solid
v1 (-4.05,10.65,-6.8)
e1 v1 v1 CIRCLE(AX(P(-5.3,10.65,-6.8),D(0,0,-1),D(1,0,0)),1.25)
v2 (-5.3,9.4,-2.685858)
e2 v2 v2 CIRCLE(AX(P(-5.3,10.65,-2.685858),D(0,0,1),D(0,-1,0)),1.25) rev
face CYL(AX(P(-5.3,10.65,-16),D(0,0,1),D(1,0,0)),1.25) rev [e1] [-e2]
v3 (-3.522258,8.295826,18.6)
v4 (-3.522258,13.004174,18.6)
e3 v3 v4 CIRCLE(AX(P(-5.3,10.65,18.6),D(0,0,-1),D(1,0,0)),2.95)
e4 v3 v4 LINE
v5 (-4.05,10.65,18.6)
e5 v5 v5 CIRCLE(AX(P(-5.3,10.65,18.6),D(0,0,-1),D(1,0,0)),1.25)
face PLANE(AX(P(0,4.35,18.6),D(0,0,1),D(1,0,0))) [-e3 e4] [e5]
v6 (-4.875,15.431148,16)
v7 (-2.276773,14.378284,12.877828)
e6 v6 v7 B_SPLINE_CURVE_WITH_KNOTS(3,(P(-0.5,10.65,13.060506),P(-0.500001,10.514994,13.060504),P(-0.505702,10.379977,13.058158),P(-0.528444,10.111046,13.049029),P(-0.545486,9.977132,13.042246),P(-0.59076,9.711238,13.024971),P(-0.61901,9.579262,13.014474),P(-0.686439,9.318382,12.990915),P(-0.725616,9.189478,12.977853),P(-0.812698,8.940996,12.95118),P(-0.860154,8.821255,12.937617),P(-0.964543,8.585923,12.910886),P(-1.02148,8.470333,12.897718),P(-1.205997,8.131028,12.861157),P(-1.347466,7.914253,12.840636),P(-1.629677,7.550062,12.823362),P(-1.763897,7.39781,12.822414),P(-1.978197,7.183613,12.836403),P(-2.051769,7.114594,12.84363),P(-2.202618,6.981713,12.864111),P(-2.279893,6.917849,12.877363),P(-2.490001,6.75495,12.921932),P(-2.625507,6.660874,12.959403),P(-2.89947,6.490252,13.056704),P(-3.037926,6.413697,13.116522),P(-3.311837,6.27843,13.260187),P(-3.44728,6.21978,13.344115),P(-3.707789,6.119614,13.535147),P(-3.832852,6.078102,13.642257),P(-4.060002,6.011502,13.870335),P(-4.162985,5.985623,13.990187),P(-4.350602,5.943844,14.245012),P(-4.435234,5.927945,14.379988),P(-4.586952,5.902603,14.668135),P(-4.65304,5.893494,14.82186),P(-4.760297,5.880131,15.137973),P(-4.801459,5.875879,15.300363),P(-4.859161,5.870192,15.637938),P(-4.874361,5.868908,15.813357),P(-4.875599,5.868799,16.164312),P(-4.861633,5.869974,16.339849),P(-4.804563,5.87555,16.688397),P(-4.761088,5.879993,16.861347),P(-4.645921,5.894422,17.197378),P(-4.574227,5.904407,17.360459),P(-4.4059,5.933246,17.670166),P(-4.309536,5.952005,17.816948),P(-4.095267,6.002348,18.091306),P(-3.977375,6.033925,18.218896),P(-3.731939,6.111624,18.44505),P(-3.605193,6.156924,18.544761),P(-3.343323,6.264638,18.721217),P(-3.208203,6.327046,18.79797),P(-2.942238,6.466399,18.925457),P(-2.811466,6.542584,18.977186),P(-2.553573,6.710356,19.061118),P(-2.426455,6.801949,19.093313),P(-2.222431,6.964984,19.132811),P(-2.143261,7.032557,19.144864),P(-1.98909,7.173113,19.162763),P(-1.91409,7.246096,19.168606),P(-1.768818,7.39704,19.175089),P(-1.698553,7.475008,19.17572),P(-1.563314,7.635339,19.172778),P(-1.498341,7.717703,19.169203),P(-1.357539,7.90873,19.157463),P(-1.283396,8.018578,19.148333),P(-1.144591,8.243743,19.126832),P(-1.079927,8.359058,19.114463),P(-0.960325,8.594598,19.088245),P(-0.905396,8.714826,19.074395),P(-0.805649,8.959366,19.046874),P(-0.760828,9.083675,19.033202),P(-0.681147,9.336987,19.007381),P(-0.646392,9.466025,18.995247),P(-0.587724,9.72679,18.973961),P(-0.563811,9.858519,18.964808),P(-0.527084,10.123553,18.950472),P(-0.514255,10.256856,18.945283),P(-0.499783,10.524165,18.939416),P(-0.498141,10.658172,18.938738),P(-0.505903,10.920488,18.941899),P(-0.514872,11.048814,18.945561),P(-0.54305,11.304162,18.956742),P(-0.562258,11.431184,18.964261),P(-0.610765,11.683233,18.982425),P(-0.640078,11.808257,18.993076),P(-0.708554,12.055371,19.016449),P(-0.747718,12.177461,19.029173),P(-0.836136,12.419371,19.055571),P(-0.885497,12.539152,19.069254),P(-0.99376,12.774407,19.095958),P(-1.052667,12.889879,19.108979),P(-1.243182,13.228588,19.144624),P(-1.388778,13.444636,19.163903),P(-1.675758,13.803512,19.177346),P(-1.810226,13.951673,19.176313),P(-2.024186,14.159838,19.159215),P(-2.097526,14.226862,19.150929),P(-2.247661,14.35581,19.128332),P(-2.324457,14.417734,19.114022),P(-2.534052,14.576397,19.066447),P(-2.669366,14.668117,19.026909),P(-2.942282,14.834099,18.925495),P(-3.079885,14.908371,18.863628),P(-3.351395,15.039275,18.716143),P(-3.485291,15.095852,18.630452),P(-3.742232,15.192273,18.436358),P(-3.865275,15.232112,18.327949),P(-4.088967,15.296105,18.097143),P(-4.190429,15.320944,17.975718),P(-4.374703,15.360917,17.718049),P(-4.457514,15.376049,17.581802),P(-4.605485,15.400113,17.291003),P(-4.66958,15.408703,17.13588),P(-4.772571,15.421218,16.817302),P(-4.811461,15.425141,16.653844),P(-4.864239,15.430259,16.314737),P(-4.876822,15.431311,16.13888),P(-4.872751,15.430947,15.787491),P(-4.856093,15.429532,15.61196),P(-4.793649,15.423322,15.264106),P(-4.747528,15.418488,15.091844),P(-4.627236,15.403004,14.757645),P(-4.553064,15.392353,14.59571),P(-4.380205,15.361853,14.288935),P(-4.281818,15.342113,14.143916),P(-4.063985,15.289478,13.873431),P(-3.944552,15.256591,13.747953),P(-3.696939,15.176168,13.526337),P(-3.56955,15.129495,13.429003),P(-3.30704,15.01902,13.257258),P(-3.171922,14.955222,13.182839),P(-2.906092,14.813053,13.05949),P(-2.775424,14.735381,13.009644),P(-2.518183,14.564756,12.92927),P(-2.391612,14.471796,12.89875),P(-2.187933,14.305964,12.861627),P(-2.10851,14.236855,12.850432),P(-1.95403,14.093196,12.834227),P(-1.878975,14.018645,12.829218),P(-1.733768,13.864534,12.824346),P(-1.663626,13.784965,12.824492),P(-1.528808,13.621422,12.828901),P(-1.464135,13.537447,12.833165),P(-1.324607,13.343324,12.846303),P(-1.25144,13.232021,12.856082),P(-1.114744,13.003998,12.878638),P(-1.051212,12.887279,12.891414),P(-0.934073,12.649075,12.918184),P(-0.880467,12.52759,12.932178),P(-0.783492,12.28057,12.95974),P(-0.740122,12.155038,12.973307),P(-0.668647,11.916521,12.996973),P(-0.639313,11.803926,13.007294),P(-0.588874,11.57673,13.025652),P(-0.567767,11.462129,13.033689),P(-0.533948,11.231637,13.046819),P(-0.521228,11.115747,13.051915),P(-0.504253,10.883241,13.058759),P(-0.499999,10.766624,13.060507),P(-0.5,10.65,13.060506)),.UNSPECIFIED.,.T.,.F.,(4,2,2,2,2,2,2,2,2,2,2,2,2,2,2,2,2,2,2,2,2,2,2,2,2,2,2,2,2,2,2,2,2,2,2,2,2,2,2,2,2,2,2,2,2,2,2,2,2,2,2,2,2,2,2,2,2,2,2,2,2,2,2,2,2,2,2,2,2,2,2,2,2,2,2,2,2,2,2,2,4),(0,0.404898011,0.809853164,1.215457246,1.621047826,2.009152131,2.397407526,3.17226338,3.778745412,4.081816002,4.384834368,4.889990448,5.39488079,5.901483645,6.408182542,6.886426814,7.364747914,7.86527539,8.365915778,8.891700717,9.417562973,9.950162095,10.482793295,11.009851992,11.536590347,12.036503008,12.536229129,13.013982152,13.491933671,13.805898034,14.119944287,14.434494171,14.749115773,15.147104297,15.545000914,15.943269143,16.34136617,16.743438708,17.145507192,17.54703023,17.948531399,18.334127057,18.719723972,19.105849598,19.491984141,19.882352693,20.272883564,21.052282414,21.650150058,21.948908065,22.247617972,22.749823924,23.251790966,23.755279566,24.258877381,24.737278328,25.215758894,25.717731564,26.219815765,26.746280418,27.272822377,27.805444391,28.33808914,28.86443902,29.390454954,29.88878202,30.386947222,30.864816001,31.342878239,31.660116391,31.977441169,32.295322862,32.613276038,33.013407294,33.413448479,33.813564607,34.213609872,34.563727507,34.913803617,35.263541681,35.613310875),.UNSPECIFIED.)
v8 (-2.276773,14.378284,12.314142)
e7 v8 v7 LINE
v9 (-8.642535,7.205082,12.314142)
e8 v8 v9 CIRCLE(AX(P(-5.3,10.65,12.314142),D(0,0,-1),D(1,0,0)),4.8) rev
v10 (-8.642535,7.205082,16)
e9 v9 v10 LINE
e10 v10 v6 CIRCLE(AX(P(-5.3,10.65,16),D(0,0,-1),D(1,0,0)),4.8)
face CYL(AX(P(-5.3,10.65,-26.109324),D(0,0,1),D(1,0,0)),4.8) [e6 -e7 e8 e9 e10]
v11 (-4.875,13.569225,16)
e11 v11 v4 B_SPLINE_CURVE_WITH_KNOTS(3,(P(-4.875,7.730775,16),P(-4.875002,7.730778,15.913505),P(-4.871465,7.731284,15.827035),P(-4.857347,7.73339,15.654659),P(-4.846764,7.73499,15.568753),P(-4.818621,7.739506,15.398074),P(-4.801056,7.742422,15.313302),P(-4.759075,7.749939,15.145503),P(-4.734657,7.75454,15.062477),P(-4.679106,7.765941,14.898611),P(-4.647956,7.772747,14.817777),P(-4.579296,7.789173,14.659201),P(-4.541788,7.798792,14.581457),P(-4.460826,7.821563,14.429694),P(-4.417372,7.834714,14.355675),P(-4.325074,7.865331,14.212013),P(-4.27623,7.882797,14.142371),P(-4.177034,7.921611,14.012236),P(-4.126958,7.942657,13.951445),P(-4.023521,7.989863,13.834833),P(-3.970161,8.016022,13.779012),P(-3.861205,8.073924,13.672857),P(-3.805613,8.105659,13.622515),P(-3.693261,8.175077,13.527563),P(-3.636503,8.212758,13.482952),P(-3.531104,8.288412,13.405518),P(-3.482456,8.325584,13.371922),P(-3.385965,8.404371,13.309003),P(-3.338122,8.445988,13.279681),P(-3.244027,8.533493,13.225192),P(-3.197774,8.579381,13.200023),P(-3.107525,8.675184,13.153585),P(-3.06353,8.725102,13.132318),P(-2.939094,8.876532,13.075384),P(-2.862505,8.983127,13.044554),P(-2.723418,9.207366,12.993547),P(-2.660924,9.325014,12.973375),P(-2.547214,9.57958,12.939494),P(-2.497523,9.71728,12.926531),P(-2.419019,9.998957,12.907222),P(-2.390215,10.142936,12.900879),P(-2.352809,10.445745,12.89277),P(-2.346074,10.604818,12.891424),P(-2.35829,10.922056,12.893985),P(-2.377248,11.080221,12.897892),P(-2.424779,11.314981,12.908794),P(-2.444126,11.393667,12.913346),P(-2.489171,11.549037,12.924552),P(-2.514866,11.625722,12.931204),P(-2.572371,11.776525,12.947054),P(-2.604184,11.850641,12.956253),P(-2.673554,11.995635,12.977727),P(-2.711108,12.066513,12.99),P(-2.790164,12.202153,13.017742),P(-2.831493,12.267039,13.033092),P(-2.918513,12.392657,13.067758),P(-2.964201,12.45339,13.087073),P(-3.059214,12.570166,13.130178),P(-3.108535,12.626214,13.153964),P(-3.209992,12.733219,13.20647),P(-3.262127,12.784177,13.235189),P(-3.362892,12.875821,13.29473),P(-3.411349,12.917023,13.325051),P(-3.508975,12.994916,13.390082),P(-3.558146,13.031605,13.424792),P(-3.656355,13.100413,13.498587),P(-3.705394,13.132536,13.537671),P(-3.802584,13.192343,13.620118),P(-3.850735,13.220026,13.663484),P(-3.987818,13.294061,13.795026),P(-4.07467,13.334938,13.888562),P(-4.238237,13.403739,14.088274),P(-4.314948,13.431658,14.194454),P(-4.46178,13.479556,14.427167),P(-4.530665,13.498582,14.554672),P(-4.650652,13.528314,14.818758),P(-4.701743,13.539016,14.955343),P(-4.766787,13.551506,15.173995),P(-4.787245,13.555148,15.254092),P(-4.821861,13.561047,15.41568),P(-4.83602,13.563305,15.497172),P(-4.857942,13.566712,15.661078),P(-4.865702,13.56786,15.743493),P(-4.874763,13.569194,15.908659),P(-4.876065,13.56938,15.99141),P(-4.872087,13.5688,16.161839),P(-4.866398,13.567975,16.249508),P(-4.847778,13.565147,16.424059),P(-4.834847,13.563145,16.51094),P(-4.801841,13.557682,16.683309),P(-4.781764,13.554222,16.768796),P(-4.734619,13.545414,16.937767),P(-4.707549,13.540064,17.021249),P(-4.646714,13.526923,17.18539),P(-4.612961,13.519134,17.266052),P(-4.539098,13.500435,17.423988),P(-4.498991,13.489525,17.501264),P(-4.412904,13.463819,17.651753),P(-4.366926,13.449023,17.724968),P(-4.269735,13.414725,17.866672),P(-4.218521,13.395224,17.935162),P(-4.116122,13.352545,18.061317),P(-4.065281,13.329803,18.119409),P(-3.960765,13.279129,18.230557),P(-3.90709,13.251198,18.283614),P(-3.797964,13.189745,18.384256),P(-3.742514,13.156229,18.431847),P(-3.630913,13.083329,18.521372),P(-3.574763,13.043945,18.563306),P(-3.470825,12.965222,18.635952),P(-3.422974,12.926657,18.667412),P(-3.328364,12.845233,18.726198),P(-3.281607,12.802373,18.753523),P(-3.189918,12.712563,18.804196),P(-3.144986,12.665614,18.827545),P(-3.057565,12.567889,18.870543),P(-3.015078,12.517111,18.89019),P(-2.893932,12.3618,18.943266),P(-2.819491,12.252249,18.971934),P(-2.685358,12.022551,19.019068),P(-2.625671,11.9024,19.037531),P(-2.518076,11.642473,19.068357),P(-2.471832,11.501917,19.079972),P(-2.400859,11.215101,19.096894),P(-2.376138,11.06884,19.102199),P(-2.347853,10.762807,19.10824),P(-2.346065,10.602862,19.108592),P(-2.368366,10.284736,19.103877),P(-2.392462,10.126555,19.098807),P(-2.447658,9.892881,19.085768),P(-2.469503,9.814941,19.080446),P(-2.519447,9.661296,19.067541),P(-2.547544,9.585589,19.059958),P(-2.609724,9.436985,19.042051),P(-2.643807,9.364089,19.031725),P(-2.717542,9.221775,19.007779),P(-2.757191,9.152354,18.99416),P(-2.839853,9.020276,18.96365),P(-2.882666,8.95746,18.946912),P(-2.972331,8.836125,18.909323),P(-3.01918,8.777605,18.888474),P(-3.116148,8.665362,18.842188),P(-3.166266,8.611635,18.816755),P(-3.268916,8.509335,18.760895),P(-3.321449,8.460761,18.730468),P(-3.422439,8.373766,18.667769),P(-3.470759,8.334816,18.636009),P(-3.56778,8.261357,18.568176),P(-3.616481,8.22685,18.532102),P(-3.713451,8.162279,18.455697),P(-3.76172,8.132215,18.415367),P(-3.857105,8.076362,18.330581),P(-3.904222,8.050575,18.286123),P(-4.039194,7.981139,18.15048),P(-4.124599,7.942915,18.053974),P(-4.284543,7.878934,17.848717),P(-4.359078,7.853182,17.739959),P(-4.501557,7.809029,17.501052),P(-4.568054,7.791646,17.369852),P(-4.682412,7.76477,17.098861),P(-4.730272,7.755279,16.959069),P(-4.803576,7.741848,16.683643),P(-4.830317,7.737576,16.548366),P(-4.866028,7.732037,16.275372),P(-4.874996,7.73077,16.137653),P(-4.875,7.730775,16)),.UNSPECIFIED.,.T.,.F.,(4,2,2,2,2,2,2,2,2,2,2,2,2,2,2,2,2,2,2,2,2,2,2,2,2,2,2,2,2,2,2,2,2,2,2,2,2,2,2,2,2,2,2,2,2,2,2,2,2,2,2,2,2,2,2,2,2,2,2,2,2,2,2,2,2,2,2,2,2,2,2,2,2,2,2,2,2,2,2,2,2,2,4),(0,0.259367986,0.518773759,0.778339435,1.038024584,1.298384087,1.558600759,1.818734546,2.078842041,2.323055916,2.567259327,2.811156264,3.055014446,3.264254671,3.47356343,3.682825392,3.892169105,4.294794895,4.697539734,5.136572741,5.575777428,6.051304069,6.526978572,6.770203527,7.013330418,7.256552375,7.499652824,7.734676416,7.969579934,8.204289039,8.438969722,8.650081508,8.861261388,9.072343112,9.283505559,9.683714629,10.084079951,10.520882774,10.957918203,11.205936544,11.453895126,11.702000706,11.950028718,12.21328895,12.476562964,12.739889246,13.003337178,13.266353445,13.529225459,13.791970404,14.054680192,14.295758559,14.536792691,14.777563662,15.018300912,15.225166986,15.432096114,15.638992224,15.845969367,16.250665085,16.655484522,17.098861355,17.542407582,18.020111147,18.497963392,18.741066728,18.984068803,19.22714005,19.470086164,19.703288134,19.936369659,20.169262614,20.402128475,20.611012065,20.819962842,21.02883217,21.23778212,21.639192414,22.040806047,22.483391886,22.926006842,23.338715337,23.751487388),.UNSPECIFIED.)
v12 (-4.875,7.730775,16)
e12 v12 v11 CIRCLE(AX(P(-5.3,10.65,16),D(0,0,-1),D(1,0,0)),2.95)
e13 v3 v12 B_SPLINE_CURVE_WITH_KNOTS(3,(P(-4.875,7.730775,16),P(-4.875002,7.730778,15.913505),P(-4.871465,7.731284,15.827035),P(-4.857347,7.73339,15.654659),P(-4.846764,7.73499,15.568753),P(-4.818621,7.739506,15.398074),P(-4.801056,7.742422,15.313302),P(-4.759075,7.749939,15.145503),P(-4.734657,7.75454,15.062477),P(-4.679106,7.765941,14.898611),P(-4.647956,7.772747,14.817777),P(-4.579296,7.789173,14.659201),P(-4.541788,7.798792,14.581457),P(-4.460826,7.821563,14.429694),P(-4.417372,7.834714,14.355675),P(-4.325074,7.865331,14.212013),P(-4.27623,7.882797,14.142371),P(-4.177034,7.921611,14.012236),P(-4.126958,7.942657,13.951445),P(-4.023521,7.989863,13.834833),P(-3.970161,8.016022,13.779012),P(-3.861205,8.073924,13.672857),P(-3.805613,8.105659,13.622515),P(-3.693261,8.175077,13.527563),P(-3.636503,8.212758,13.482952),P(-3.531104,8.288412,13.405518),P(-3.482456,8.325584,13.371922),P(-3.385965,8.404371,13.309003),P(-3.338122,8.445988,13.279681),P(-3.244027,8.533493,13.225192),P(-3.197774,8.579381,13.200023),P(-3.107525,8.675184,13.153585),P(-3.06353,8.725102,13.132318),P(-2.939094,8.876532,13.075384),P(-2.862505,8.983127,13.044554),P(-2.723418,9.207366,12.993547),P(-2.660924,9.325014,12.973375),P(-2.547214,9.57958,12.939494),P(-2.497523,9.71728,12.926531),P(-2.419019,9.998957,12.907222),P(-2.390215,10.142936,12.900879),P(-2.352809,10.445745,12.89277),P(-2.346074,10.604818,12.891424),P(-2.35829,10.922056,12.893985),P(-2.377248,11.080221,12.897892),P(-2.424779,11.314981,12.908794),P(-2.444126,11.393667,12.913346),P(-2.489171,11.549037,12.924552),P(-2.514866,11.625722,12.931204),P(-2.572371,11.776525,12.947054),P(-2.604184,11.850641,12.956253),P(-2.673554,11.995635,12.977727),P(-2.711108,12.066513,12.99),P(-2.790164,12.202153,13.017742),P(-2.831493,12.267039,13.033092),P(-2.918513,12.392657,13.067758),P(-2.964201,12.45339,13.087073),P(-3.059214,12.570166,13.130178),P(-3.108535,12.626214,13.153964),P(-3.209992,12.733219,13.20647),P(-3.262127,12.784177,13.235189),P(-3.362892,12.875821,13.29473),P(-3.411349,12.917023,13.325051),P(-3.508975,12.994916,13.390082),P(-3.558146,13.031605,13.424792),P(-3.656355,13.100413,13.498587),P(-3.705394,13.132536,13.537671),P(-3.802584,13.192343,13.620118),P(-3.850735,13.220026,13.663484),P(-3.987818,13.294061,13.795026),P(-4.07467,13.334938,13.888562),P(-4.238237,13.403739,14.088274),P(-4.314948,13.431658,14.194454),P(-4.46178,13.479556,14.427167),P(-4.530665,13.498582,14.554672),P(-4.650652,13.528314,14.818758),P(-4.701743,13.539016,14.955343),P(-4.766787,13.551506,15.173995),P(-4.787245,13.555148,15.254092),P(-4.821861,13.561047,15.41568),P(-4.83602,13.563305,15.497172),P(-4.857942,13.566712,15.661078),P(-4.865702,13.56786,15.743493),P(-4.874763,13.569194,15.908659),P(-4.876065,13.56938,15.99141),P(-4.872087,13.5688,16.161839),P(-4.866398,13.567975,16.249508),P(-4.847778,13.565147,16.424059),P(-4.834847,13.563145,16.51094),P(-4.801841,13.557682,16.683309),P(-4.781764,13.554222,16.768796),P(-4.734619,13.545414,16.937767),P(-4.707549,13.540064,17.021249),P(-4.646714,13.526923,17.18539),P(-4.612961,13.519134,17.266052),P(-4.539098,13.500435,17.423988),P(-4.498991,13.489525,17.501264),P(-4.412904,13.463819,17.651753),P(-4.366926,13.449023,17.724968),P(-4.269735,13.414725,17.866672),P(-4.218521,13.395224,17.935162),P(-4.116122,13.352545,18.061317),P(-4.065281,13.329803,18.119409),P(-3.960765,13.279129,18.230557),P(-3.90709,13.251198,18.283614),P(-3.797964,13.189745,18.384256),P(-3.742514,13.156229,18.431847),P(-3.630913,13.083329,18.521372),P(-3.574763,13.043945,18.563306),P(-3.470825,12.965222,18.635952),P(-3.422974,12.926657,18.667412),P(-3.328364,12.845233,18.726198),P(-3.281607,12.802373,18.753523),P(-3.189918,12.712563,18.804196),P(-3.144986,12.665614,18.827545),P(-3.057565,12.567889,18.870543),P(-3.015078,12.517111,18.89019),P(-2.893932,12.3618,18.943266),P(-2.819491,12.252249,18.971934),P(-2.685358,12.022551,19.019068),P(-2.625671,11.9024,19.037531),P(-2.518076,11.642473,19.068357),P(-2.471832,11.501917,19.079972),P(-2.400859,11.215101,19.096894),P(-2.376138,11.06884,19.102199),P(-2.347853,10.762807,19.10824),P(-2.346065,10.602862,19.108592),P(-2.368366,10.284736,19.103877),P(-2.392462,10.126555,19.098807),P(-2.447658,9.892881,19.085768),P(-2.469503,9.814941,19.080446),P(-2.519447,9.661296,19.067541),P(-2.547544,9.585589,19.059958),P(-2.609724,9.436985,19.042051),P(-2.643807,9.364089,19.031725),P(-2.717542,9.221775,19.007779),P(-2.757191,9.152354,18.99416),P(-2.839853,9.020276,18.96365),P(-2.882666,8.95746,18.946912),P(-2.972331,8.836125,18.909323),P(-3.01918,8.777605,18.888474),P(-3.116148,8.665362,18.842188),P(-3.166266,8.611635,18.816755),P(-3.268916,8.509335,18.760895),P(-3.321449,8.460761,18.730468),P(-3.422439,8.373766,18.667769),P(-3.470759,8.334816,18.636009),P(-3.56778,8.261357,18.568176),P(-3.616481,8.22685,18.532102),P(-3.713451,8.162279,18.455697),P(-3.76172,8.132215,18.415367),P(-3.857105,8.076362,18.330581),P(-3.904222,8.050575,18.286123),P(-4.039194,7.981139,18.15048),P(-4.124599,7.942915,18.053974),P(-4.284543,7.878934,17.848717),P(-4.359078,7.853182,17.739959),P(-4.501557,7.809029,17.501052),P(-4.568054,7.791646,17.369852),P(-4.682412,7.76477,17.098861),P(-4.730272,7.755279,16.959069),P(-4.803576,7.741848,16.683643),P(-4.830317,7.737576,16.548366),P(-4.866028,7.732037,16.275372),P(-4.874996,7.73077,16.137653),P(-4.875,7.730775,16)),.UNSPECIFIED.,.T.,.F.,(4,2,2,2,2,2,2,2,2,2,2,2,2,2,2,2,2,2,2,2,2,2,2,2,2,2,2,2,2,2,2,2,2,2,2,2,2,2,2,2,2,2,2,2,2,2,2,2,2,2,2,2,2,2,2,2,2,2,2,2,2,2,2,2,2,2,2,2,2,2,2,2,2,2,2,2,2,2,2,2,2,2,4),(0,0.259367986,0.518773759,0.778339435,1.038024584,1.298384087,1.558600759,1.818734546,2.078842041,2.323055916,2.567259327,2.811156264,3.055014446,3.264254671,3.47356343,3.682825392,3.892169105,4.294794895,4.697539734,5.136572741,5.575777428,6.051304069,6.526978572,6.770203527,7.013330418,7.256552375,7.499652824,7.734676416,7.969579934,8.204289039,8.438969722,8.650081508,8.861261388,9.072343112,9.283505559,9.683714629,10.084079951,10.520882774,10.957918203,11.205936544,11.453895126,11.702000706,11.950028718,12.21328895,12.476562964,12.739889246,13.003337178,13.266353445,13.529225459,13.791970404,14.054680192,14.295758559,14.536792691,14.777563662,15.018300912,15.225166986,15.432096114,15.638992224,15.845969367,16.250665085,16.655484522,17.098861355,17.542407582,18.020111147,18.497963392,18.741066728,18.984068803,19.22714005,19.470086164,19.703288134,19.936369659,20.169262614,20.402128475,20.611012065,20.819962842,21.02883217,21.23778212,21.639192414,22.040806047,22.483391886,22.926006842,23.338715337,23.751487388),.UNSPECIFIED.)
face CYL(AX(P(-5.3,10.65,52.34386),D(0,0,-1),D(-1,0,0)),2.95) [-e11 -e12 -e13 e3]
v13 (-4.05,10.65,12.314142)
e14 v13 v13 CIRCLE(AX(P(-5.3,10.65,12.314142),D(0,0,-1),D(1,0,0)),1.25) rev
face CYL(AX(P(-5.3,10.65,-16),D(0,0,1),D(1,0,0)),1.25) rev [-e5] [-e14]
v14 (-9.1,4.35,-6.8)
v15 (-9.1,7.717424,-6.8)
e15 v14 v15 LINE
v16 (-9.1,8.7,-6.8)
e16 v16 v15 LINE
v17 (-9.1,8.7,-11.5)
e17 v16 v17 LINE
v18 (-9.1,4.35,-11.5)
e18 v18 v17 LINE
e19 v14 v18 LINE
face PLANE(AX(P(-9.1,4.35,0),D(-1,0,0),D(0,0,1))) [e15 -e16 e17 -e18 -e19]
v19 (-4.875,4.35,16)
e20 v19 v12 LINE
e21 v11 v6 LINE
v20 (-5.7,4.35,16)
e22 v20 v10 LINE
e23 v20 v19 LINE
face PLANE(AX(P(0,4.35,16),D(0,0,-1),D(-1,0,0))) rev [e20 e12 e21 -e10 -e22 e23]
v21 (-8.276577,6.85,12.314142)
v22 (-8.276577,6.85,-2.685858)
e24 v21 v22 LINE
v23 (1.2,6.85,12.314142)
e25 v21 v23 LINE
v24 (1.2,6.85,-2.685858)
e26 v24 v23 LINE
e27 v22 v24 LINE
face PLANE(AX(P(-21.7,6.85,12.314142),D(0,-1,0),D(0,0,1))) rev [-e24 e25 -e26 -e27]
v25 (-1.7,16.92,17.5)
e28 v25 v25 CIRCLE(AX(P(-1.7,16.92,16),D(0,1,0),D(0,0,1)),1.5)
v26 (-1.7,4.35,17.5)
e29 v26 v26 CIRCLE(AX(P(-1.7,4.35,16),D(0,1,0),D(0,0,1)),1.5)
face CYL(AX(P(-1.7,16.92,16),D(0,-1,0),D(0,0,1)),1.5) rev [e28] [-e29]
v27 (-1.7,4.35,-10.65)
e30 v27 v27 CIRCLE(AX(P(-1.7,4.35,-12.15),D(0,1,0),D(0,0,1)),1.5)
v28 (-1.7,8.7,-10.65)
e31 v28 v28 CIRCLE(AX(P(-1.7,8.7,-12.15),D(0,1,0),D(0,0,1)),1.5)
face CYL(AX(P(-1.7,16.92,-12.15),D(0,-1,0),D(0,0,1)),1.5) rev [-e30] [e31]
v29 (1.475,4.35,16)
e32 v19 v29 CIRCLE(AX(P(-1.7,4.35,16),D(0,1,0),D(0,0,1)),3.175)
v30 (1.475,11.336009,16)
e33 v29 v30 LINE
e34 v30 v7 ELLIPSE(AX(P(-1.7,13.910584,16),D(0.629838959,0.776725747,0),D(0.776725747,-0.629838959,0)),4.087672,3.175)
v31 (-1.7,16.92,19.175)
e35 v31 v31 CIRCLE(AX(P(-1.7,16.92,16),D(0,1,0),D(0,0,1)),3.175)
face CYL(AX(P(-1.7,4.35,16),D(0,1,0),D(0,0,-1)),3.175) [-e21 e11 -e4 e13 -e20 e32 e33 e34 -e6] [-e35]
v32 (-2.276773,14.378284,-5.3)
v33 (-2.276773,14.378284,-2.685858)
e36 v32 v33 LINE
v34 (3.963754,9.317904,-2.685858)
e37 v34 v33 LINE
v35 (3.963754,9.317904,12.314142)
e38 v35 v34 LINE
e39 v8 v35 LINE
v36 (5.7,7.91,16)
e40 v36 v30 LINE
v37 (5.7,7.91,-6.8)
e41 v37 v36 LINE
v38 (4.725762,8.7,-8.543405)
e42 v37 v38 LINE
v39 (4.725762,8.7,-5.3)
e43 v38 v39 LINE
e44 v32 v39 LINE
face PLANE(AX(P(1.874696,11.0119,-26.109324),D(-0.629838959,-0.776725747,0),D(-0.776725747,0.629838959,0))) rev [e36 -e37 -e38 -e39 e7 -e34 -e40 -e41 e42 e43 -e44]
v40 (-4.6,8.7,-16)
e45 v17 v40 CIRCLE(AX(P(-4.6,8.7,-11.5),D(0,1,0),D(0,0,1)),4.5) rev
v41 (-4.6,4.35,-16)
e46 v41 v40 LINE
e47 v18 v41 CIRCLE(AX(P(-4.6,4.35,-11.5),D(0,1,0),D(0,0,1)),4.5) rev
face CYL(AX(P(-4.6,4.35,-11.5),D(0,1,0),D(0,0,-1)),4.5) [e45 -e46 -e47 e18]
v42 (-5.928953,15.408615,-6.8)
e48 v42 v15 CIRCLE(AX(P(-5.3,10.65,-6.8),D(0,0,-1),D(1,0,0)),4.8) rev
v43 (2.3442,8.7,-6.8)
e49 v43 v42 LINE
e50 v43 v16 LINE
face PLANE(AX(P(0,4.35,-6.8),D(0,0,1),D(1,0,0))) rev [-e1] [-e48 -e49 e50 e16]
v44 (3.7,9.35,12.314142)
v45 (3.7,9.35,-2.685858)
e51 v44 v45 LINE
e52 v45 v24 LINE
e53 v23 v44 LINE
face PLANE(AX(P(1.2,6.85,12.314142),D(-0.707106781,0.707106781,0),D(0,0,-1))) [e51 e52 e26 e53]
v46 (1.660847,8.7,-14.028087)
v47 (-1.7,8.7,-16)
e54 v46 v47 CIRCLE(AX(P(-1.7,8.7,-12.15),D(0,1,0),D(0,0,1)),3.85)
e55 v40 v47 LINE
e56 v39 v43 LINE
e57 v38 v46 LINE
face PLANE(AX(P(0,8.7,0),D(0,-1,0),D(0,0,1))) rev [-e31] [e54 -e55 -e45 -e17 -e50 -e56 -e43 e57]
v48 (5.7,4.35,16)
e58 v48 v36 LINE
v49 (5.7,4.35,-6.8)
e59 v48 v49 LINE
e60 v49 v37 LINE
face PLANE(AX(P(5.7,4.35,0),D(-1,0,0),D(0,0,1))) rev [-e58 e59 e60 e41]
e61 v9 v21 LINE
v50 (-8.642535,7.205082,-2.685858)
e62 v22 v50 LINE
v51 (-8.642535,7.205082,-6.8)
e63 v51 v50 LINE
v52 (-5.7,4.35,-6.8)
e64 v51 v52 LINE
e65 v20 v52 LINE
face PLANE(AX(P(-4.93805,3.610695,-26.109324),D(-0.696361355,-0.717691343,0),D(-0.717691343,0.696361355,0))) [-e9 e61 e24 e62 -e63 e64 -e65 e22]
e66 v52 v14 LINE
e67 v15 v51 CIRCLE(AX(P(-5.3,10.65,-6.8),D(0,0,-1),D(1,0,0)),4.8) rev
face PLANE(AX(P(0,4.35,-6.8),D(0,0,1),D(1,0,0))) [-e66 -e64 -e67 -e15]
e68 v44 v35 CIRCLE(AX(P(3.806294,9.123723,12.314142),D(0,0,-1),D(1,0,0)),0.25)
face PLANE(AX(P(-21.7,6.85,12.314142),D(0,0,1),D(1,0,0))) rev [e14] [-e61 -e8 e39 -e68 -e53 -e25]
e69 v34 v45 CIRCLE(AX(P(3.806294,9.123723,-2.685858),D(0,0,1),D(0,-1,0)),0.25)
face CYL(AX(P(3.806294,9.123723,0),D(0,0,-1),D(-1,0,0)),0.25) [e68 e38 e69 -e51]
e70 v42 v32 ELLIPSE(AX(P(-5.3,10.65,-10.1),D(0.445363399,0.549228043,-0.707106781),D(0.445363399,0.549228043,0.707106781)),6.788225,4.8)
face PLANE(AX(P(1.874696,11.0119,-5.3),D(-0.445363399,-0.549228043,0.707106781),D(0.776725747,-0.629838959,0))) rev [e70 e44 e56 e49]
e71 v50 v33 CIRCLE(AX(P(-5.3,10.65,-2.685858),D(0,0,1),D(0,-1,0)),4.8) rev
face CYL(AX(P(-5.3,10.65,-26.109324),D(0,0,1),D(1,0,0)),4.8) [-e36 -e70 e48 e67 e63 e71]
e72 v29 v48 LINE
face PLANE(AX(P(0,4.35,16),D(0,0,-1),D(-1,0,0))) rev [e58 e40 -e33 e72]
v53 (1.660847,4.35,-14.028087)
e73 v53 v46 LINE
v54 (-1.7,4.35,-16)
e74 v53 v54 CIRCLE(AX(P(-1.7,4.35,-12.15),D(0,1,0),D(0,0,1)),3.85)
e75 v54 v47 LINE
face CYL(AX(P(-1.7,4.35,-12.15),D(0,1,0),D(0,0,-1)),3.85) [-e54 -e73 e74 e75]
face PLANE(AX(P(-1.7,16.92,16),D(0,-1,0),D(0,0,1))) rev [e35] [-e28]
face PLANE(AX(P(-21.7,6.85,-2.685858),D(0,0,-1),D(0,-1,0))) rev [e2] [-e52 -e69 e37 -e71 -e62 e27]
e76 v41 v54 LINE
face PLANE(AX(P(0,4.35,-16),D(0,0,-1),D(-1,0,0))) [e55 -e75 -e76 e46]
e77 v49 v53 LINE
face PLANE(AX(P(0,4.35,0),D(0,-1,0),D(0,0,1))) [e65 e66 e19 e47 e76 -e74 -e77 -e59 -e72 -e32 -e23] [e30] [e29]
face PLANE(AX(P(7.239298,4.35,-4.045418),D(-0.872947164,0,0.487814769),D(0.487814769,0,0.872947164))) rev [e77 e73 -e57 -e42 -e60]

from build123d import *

# Parameters (mm, degrees)
BOSS_EXTRUDE1_DEPTH = 4.35
BOSS_EXTRUDE2_DEPTH = 22.8
CUT_EXTRUDE1_DEPTH  = 35.228241264
BOSS_EXTRUDE3_START = -12.57
SKETCH5_R           = 3.175
BOSS_EXTRUDE3_DEPTH = 12.57
SKETCH6_R           = 2.95
BOSS_EXTRUDE4_DEPTH = 2.6
CHAMFER1_SIZE       = 1.5
SKETCH7_R           = 1.5
CUT_EXTRUDE2_DEPTH  = 26.053852665
SKETCH8_R           = 1.25
CUT_EXTRUDE3_DEPTH  = 37.969425255
SKETCH9_W           = 15
SKETCH9_H           = 8.6
CUT_EXTRUDE4_DEPTH  = 25.4
CHAMFER2_SIZE       = 2.5
FILLET1_R           = 0.25


with BuildPart() as part:
    # Sketch2 → Boss-Extrude1 (new body)
    with BuildSketch(Plane(origin=(0, 0, 0), x_dir=(1, 0, 0), z_dir=(0, 1, 0))):
        with BuildLine():
            ThreePointArc((1.475, -16), (-1.7, -12.825), (-4.875, -16))
            Line((-4.875, -16), (1.475, -16))
        make_face()
        with BuildLine():
            Line((1.475, -16), (-4.875, -16))
            ThreePointArc((-4.875, -16), (-1.7, -19.175), (1.475, -16))
        make_face()
        with BuildLine():
            Line((-5.7, 15.863484846), (-5.7, 6.8))
            Line((-5.7, 6.8), (-5.7, -16))
            Line((-5.7, -16), (-4.875, -16))
            ThreePointArc((-4.875, -16), (-1.7, -12.825), (1.475, -16))
            Line((1.475, -16), (5.7, -16))
            Line((5.7, -16), (5.7, 6.8))
            Line((5.7, 6.8), (1.660846582, 14.02808686))
            ThreePointArc((1.660846582, 14.02808686), (0.248315373, 15.470627532), (-1.7, 16))
            Line((-1.7, 16), (-4.6, 16))
            ThreePointArc((-4.6, 16), (-5.154219358, 15.965740801), (-5.7, 15.863484846))
        make_face()
        with BuildLine():
            Line((-9.1, 6.8), (-5.7, 6.8))
            Line((-5.7, 6.8), (-5.7, 15.863484846))
            ThreePointArc((-5.7, 15.863484846), (-8.14964787, 14.265863337), (-9.1, 11.5))
            Line((-9.1, 11.5), (-9.1, 6.8))
        make_face()
    extrude(amount=BOSS_EXTRUDE1_DEPTH)

    # Sketch3 → Boss-Extrude2 (add)
    with BuildSketch(Plane.XY.offset(16)):
        with BuildLine():
            Line((5.7, 0.79), (-4.875, 4.092368421))
            Line((-4.875, 4.092368421), (-4.875, 2.831147875))
            ThreePointArc((-4.875, 2.831147875), (-1.758813758, 1.290370349), (-0.5, -1.95))
            ThreePointArc((-0.5, -1.95), (-0.966901247, -4.015007311), (-2.276772998, -5.678283585))
            Line((-2.276772998, -5.678283585), (5.7, 0.79))
        make_face()
        with BuildLine():
            ThreePointArc((-5.7, 2.833304297), (-7.287324911, 2.419272216), (-8.642534504, 1.494918444))
            ThreePointArc((-8.642534504, 1.494918444), (-8.890152665, -5.136032618), (-2.276772998, -5.678283585))
            ThreePointArc((-2.276772998, -5.678283585), (-0.966901247, -4.015007311), (-0.5, -1.95))
            ThreePointArc((-0.5, -1.95), (-1.758813758, 1.290370349), (-4.875, 2.831147875))
            Line((-4.875, 2.831147875), (-4.875, 0))
            Line((-4.875, 0), (-5.7, 0))
            Line((-5.7, 0), (-5.7, 2.833304297))
        make_face()
        with BuildLine():
            ThreePointArc((-4.875, 2.831147875), (-5.287453585, 2.849983603), (-5.7, 2.833304297))
            Line((-5.7, 2.833304297), (-5.7, 0))
            Line((-5.7, 0), (-4.875, 0))
            Line((-4.875, 0), (-4.875, 2.831147875))
        make_face()
        with BuildLine():
            Line((-4.875, 4.092368421), (-5.7, 4.35))
            Line((-5.7, 4.35), (-5.7, 2.833304297))
            ThreePointArc((-5.7, 2.833304297), (-5.287453585, 2.849983603), (-4.875, 2.831147875))
            Line((-4.875, 2.831147875), (-4.875, 4.092368421))
        make_face()
        with BuildLine():
            Line((-5.7, 2.833304297), (-5.7, 4.35))
            Line((-5.7, 4.35), (-8.642534504, 1.494918444))
            ThreePointArc((-8.642534504, 1.494918444), (-7.287324911, 2.419272216), (-5.7, 2.833304297))
        make_face()
    extrude(amount=-BOSS_EXTRUDE2_DEPTH)

    # Sketch4 → Cut-Extrude1 (cut, through all)
    with BuildSketch(Plane.XY.offset(16)):
        Polygon((5.7, 0), (5.7, 0.79), (4.725761535, 0), align=None)
    extrude(amount=-CUT_EXTRUDE1_DEPTH, mode=Mode.SUBTRACT)

    # Sketch5 → Boss-Extrude3 (add)
    with BuildSketch(Plane(origin=(0, 4.35, 0), x_dir=(1, 0, 0), z_dir=(0, 1, 0)).offset(BOSS_EXTRUDE3_START)):
        with Locations(Location((-1.7, -16, 0), (0, 0, 100.46651796))):
            Circle(SKETCH5_R)
    extrude(amount=BOSS_EXTRUDE3_DEPTH)

    # Sketch6 → Boss-Extrude4 (add)
    with BuildSketch(Plane.XY.offset(16)):
        with Locations((-5.3, -1.95)):
            Circle(SKETCH6_R)
    extrude(amount=BOSS_EXTRUDE4_DEPTH)

    # Chamfer1
    # the kernel refuses this chamfer: 1.5 mm, written as the material it takes off along each edge
    with BuildSketch(Plane(origin=(-5.273011582, -8.107902789, -6.8), x_dir=(0.017317974295388713, -0.021356755298707605, 0.9996219169112968), z_dir=(0.7767257469610731, 0.6298389587884852, 0))) as chamfer1_piece_1_section:
        Polygon((CHAMFER1_SIZE * 0.999621916911, -CHAMFER1_SIZE * 0.0274958766106), (-CHAMFER1_SIZE * 0.0274958766106, -CHAMFER1_SIZE * 0.999621916911), (0, 0), align=None)
    chamfer1_piece_1 = extrude(amount=16.730502051, mode=Mode.PRIVATE)
    chamfer1_piece_1 = split(chamfer1_piece_1, bisect_by=Plane(origin=(-2.677352376, 0, -6.368001428), z_dir=(0, -1, 0)), keep=Keep.TOP, mode=Mode.PRIVATE)
    add(chamfer1_piece_1, mode=Mode.SUBTRACT)

    # Sketch7 → Cut-Extrude2 (cut, through all)
    with BuildSketch(Plane(origin=(0, 4.35, 0), x_dir=(1, 0, 0), z_dir=(0, 1, 0))):
        with Locations(Location((-1.7, 12.15, 0), (0, 0, 270))):
            Circle(SKETCH7_R)
        with Locations(Location((-1.7, -16, 0), (0, 0, 270))):
            Circle(SKETCH7_R)
    extrude(amount=-CUT_EXTRUDE2_DEPTH, mode=Mode.SUBTRACT)

    # Sketch8 → Cut-Extrude3 (cut, through all)
    with BuildSketch(Plane.XY.offset(18.6)):
        with Locations((-5.3, -1.95)):
            Circle(SKETCH8_R)
    extrude(amount=-CUT_EXTRUDE3_DEPTH, mode=Mode.SUBTRACT)

    # Sketch9 → Cut-Extrude4 (cut)
    with BuildSketch(Plane(origin=(3.7, 0, 0), x_dir=(0, 0, -1), z_dir=(1, 0, 0))):
        with Locations((-4.814141793, -2.45)):
            Rectangle(SKETCH9_W, SKETCH9_H)
    extrude(amount=-CUT_EXTRUDE4_DEPTH, mode=Mode.SUBTRACT)

    # Chamfer2
    chamfer2_edges = [part.edges().sort_by_distance(p)[0] for p in [
        (3.7, 1.85, 4.814141793),
    ]]
    chamfer(chamfer2_edges, length=CHAMFER2_SIZE)

    # Fillet1
    # the kernel refuses this fillet: 0.25 mm, written as the material it takes off along each edge
    with BuildSketch(Plane(origin=(3.7, -0.831779531, 12.314141793), x_dir=(0, 1, 0), z_dir=(0, 0, -1))) as fillet1_piece_1:
        with BuildLine():
            CenterArc((0.408056999, 0.106294437), FILLET1_R, 140.961757793, 64.20015701)
            Line((0.213875562, 0.263754177), (0, 0))
            Line((0, 0), (0.181779531, 0))
        make_face()
    extrude(amount=15, mode=Mode.SUBTRACT)


with BuildPart() as body_2:
    # Mirror1: mirrored copy
    add(part.part.mirror(Plane.ZX.offset(4.35)))


solid = body_2.part
